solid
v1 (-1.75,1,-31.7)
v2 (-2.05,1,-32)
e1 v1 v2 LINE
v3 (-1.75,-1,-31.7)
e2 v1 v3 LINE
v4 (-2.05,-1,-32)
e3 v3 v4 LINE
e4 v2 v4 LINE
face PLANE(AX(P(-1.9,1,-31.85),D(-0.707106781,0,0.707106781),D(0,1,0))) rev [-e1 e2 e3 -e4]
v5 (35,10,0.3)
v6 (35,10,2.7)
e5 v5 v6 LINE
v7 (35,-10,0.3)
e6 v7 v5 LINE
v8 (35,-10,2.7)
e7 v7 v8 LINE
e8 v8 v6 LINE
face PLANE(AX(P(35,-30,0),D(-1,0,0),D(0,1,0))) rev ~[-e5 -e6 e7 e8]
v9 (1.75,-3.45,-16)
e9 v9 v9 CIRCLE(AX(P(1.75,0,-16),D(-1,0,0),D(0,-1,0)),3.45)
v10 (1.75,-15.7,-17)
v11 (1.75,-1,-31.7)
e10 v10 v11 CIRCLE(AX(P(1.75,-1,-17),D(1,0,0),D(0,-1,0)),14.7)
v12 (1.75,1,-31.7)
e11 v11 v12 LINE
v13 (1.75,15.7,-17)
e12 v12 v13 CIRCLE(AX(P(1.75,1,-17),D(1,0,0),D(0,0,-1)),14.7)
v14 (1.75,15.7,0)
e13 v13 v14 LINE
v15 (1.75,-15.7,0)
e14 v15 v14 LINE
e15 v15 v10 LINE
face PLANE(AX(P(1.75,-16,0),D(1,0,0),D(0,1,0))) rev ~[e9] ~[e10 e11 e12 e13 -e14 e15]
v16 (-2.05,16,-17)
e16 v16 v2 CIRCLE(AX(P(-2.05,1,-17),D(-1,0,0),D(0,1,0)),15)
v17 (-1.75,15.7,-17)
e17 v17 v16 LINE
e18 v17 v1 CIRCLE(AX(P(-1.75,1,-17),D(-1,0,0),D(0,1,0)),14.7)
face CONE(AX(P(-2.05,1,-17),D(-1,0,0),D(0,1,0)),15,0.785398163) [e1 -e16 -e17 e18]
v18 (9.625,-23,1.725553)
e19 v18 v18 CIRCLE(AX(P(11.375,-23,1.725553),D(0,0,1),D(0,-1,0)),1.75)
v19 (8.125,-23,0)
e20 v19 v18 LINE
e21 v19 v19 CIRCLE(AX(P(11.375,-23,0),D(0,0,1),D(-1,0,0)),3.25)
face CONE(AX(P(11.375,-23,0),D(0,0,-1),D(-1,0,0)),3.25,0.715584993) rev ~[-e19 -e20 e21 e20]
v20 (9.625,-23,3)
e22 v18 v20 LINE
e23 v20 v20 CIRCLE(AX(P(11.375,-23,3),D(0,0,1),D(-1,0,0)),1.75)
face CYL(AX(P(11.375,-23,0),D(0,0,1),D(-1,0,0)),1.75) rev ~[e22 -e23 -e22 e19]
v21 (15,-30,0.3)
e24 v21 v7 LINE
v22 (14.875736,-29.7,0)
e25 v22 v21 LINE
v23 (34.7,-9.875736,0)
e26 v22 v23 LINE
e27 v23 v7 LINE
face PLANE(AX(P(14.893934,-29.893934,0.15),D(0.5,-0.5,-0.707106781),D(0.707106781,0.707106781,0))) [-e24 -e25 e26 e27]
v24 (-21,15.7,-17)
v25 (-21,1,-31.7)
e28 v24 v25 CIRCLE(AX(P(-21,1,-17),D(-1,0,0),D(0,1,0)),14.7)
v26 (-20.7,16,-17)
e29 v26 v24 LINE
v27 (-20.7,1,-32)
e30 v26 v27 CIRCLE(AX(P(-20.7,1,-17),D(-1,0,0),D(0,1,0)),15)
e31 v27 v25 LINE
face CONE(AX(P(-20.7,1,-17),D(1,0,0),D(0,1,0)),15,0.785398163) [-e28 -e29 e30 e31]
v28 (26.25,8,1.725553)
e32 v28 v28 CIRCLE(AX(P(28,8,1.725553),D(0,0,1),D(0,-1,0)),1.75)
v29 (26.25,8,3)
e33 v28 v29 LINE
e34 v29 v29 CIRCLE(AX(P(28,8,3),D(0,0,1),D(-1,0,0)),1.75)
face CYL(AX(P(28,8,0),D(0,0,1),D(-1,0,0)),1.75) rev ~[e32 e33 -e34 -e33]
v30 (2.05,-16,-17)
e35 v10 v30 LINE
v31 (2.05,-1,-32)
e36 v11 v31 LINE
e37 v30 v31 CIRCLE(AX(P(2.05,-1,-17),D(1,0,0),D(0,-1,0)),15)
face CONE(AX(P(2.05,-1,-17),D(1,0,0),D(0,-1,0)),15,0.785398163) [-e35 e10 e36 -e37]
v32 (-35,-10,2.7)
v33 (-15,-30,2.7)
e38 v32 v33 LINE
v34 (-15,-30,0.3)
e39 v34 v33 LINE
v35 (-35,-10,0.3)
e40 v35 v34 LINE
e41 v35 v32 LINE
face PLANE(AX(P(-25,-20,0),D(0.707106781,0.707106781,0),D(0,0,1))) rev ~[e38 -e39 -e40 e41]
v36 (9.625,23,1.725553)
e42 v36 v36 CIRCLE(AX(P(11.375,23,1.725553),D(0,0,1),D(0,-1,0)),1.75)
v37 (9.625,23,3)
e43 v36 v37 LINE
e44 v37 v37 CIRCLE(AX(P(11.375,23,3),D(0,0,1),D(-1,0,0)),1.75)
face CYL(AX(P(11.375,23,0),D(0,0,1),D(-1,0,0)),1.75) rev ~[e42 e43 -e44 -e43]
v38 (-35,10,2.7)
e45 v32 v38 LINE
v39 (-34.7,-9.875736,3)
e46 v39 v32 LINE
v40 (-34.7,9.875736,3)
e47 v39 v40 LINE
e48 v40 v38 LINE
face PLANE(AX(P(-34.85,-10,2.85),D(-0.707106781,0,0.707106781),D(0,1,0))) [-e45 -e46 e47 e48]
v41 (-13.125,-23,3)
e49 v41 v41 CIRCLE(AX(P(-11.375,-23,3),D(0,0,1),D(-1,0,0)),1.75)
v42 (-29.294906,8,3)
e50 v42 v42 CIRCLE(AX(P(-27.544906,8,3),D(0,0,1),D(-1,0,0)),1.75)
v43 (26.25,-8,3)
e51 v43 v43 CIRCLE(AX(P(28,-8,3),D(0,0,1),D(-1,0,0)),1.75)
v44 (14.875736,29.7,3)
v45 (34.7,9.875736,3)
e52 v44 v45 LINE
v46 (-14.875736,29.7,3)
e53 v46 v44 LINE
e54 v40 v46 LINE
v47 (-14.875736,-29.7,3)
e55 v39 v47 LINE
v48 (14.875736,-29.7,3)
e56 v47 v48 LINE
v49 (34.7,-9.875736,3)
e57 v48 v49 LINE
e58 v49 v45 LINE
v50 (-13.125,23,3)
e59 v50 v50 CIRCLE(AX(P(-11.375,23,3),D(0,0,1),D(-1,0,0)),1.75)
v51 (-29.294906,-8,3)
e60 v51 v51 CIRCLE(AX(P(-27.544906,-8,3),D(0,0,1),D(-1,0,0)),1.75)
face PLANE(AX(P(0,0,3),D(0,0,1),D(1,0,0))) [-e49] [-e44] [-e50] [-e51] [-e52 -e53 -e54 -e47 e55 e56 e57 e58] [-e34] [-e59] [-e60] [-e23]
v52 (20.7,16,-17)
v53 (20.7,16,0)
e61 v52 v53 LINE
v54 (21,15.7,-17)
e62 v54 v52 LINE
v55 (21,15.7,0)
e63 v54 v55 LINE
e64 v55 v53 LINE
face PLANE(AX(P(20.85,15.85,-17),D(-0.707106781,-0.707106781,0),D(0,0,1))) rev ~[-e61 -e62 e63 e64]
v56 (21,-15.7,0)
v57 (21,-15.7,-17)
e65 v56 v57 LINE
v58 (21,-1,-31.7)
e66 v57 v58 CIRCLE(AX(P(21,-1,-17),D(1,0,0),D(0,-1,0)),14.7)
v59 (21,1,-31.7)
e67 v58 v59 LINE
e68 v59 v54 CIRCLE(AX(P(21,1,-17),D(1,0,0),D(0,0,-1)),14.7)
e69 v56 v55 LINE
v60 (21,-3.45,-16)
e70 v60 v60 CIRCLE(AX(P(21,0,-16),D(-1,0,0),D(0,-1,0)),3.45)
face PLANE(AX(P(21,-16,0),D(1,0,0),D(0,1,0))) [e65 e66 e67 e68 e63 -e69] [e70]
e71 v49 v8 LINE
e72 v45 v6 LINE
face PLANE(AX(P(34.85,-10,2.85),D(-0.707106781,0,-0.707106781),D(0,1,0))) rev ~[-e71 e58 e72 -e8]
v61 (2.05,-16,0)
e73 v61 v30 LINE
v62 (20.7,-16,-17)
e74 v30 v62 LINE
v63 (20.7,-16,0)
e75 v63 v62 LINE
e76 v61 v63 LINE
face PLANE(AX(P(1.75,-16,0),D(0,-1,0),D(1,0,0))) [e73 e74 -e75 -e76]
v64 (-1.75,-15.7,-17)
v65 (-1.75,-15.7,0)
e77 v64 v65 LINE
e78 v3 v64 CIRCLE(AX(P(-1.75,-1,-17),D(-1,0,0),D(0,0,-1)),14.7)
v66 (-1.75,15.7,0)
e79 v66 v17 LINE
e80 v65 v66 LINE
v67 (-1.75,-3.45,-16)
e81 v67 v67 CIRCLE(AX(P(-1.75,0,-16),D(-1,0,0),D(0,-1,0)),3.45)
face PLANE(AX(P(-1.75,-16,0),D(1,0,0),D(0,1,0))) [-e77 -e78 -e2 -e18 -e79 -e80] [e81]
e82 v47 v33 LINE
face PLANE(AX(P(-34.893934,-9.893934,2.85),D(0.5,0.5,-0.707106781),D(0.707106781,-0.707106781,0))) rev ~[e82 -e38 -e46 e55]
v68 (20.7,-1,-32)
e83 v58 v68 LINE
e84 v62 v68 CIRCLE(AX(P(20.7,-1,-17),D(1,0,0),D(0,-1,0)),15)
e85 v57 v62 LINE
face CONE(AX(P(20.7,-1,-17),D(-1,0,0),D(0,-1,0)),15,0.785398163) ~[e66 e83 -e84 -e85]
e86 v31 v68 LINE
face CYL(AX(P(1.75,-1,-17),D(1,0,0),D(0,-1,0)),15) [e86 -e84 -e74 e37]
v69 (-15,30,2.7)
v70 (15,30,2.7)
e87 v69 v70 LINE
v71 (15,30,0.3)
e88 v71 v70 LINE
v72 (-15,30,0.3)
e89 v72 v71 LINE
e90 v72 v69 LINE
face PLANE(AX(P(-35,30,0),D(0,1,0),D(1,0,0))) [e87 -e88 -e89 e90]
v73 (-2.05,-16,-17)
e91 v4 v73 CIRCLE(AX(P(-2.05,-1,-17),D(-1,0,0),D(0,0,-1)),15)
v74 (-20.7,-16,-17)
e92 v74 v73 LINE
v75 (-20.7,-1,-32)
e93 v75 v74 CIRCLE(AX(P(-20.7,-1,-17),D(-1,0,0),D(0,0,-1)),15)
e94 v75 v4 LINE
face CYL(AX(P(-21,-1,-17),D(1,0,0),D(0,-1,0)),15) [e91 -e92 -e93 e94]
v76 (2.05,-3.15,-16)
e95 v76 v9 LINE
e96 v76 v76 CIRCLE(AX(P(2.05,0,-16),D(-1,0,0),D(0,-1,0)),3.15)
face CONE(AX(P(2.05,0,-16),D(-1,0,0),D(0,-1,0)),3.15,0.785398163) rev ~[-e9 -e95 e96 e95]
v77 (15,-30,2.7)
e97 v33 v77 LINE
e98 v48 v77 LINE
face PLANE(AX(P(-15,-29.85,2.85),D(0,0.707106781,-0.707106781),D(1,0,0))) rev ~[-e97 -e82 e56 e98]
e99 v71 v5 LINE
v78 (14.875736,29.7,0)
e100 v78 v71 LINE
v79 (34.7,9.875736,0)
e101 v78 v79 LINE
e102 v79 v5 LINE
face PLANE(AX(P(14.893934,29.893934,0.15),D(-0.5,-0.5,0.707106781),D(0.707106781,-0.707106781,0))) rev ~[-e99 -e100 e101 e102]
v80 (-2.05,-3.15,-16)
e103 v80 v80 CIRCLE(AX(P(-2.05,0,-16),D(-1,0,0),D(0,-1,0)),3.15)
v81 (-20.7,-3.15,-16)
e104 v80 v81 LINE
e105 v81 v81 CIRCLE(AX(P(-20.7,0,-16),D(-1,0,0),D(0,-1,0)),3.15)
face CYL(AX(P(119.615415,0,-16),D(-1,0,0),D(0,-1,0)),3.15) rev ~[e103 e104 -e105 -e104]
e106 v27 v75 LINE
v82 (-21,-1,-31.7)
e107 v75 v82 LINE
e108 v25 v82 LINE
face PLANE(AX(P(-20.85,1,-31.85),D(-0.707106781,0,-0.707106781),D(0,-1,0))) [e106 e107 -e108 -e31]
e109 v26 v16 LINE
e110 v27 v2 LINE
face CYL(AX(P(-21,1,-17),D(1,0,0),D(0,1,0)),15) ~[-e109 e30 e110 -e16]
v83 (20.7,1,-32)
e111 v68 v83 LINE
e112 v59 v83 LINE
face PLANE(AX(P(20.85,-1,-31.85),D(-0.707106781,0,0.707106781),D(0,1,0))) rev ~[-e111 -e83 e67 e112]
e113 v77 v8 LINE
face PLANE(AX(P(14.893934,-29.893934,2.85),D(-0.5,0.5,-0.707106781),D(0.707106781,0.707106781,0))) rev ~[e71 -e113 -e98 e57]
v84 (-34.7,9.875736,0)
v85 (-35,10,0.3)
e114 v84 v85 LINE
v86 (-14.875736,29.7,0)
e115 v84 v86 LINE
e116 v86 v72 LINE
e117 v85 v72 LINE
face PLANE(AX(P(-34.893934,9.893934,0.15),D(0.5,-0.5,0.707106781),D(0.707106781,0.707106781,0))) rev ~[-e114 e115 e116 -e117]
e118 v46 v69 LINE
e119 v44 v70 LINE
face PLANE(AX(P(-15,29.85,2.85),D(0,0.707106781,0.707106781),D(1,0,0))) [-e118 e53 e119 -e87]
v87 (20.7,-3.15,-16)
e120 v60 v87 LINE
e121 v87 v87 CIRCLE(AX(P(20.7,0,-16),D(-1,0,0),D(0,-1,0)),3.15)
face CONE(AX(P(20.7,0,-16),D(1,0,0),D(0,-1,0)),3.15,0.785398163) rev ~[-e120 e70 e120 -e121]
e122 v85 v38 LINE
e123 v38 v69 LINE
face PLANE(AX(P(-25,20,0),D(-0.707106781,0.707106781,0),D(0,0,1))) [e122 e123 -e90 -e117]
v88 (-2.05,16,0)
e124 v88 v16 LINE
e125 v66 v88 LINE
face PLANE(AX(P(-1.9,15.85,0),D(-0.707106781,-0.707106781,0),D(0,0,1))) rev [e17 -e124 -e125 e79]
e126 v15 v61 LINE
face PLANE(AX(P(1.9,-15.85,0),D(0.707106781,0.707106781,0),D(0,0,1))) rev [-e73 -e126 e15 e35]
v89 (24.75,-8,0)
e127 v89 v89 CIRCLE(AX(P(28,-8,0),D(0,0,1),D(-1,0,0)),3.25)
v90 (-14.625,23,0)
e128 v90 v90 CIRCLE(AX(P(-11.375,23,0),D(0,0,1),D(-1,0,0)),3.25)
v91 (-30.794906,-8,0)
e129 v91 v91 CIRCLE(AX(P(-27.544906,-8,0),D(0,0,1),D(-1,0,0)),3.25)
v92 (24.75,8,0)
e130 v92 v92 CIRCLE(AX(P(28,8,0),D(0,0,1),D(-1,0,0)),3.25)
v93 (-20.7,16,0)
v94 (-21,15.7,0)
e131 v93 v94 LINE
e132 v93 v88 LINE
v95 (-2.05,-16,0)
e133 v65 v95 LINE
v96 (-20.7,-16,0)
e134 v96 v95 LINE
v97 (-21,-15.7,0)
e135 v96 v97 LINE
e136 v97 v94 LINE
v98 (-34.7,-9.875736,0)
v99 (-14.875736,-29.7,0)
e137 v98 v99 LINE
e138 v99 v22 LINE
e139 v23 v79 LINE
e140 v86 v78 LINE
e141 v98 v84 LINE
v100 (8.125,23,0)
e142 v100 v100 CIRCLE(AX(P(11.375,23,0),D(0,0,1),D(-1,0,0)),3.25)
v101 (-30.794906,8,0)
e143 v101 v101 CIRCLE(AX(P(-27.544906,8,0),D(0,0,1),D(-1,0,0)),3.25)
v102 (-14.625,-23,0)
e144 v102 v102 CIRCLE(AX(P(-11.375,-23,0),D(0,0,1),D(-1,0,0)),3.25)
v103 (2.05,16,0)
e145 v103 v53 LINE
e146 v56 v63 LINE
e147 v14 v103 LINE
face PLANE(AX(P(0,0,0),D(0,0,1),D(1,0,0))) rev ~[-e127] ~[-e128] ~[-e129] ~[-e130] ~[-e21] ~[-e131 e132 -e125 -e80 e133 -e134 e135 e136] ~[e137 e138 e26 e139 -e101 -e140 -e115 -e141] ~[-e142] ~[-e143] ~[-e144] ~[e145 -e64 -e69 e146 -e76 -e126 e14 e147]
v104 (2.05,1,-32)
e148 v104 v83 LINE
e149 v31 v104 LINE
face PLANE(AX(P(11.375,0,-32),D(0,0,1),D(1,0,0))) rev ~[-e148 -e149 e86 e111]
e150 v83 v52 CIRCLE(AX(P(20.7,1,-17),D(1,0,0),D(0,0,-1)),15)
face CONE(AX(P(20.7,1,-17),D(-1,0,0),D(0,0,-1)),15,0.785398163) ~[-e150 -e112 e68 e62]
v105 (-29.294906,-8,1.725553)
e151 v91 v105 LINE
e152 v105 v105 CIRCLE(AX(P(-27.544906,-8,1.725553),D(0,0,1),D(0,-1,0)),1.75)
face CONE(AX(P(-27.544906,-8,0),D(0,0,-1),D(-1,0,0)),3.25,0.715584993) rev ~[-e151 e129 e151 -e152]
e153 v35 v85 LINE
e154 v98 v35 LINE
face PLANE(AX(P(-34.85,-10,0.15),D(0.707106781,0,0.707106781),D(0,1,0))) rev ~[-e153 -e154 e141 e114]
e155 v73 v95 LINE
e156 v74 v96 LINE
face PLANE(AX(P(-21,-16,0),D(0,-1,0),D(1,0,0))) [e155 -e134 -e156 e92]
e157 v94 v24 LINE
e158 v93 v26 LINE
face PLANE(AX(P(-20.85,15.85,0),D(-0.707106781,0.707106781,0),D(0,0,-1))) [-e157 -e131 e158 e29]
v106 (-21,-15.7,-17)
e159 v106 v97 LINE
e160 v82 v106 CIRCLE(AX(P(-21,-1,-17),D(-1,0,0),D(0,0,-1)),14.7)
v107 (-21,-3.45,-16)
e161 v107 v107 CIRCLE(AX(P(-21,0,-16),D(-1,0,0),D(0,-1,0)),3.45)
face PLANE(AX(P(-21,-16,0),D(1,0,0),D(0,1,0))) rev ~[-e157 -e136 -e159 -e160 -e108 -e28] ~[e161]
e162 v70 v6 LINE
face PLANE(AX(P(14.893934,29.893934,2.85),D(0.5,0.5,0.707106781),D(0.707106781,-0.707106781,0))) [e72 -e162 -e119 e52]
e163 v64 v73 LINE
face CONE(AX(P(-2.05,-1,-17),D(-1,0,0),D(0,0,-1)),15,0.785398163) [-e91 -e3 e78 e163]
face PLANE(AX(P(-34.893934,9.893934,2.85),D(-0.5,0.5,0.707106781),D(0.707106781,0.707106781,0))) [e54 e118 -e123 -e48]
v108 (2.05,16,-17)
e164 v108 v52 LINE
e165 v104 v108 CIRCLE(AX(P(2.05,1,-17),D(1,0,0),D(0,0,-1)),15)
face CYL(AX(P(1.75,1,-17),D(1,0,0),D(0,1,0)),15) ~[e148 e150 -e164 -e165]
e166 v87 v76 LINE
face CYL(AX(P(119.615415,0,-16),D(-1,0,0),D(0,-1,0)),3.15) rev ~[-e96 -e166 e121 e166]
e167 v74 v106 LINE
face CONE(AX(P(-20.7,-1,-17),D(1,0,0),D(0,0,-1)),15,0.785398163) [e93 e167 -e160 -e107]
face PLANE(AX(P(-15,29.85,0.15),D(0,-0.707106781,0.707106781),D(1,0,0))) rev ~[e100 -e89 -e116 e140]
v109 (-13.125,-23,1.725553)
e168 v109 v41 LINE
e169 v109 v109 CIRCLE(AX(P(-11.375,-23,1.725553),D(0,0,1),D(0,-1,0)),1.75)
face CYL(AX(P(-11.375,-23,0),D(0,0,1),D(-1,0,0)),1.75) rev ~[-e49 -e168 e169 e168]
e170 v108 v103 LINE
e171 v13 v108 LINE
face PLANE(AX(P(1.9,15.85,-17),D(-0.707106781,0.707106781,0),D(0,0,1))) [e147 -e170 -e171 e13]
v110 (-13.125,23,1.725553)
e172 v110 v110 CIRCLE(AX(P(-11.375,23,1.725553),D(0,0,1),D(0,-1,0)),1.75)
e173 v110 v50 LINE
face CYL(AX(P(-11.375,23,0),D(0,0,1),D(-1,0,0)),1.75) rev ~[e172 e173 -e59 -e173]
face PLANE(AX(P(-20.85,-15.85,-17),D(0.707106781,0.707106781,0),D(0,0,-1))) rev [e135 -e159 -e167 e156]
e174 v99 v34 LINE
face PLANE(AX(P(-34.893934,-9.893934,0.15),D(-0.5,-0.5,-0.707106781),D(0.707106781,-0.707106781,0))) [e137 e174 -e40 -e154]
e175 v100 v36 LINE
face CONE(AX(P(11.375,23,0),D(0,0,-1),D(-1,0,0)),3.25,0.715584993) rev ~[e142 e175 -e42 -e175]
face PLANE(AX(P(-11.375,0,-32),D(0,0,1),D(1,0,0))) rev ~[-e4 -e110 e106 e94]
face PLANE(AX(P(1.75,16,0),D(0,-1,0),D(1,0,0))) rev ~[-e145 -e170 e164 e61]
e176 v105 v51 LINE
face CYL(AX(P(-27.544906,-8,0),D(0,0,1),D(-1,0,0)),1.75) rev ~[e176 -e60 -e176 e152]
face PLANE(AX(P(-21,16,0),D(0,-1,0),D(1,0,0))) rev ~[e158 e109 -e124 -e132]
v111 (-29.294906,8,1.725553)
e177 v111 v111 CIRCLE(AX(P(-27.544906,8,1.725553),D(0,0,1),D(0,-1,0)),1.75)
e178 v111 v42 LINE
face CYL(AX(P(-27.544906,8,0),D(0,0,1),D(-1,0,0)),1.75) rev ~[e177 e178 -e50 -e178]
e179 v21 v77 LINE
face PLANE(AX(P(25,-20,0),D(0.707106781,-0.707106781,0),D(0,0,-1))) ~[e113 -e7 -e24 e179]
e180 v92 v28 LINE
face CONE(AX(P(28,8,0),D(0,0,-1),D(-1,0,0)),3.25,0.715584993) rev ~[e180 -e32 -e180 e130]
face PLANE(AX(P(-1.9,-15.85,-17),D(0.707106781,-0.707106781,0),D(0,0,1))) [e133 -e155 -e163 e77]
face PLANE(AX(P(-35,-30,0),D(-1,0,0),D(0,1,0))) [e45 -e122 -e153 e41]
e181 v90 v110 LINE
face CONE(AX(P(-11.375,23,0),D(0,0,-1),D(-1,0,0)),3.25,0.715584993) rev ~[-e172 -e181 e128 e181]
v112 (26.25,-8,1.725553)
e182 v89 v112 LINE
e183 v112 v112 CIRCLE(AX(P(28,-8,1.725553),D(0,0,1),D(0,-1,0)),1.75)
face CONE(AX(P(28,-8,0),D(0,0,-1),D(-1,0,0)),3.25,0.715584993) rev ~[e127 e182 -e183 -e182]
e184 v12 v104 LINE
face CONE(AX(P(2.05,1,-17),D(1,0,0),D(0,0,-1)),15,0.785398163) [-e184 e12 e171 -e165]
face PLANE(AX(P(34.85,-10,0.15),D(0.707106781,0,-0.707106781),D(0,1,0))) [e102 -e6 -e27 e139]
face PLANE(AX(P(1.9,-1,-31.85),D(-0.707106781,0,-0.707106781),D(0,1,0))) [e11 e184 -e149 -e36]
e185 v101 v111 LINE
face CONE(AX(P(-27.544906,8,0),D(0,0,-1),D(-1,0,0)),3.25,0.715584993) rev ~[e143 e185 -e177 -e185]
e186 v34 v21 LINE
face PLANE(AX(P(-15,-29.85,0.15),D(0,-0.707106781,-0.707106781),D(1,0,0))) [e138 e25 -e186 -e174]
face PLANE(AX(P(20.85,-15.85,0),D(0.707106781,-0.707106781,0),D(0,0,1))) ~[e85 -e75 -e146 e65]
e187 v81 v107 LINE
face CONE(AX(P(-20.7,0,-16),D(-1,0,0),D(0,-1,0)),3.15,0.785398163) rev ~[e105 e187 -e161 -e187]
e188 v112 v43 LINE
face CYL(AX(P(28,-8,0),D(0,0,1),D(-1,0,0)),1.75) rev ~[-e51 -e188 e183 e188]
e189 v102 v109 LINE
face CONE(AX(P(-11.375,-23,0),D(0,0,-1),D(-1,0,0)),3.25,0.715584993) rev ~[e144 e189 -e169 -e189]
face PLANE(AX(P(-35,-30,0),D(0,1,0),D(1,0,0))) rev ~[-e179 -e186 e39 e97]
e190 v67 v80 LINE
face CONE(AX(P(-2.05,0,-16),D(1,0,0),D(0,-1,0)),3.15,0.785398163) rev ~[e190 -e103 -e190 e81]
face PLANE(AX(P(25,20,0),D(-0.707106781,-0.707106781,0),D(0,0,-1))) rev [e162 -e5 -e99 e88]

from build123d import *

# Parameters (mm, degrees)
F0_W           = 70
F0_H           = 60
F0_W_2         = 19.25
F0_H_2         = 32
F1_DEPTH       = 3
F2_DEPTH       = 32
F4_D           = 6.3
F5_R           = 15
F6_SIZE        = 20
F7_D           = 3.5
F7_CSINK_D     = 6.5
F7_CSINK_ANGLE = 82
F8_SIZE        = 0.3


# Not quite as in the source:
# - a feature names something its author has since deleted; it is built from what else it names


with BuildPart() as f1:
    # F0 (on Top) → F1 (new body)
    with BuildSketch(Plane.XY):
        Rectangle(F0_W, F0_H)
        with Locations((-11.375, 0)):
            Rectangle(F0_W_2, F0_H_2, mode=Mode.SUBTRACT)
        with Locations((11.375, 0)):
            Rectangle(F0_W_2, F0_H_2, mode=Mode.SUBTRACT)
        with Locations((11.375, 0)):
            Rectangle(F0_W_2, F0_H_2)
        with Locations((-11.375, 0)):
            Rectangle(F0_W_2, F0_H_2)
    extrude(amount=F1_DEPTH)

    # F0 (on Top) → F2 (join)
    with BuildSketch(Plane.XY):
        with Locations((-11.375, 0)):
            Rectangle(F0_W_2, F0_H_2)
        with Locations((11.375, 0)):
            Rectangle(F0_W_2, F0_H_2)
    extrude(amount=-F2_DEPTH)

    # F4 (through all)
    with Locations(Plane.YZ.offset(21)):
        with Locations((0, -16)):
            Hole(F4_D / 2)

    # F5
    f5_edges = [f1.edges().sort_by_distance(p)[0] for p in [
        (11.375, 16, -32),
        (11.375, -16, -32),
        (-11.375, -16, -32),
        (-11.375, 16, -32),
    ]]
    fillet(f5_edges, radius=F5_R)

    # F6
    f6_edges = [f1.edges().sort_by_distance(p)[0] for p in [
        (-35, 30, 1.5),
        (-35, -30, 1.5),
        (35, -30, 1.5),
        (35, 30, 1.5),
    ]]
    chamfer(f6_edges, length=F6_SIZE)

    # F7 (through all)
    with Locations(Plane(origin=(0, 0, 0), x_dir=(1, 0, 0), z_dir=(0, 0, -1))):
        with Locations((-11.375, -23), (11.375, -23), (28, -8), (28, 8), (11.375, 23), (-11.375, 23), (-27.5449063629, 8), (-27.5449063629, -8)):
            CounterSinkHole(F7_D / 2, F7_CSINK_D / 2, counter_sink_angle=F7_CSINK_ANGLE)

    # F8
    f8_edges = [f1.edges().sort_by_distance(p)[0] for p in [
        (1.75, -16, -8.5),
        (21, -16, -8.5),
        (0, -30, 0),
        (35, 0, 0),
        (0, -30, 3),
        (35, 0, 3),
        (0, 30, 3),
        (0, 30, 0),
        (-35, 0, 3),
        (-35, 0, 0),
        (-25, -20, 0),
        (-25, -20, 3),
        (-25, 20, 0),
        (-25, 20, 3),
        (25, 20, 3),
        (25, 20, 0),
        (25, -20, 3),
        (25, -20, 0),
        (-21, 16, -8.5),
        (-21, 11.606602, -27.606602),
        (-21, 0, -32),
        (-21, -16, -8.5),
        (-21, -11.606602, -27.606602),
        (-21, -3.15, -16),
        (-1.75, 16, -8.5),
        (-1.75, -16, -8.5),
        (-1.75, -11.606602, -27.606602),
        (-1.75, 0, -32),
        (-1.75, 11.606602, -27.606602),
        (-1.75, -3.15, -16),
        (1.75, 16, -8.5),
        (1.75, 11.606602, -27.606602),
        (1.75, 0, -32),
        (1.75, -11.606602, -27.606602),
        (1.75, -3.15, -16),
        (21, -11.606602, -27.606602),
        (21, 0, -32),
        (21, 16, -8.5),
        (21, 11.606602, -27.606602),
        (21, -3.15, -16),
    ]]
    chamfer(f8_edges, length=F8_SIZE)


solid = f1.part
